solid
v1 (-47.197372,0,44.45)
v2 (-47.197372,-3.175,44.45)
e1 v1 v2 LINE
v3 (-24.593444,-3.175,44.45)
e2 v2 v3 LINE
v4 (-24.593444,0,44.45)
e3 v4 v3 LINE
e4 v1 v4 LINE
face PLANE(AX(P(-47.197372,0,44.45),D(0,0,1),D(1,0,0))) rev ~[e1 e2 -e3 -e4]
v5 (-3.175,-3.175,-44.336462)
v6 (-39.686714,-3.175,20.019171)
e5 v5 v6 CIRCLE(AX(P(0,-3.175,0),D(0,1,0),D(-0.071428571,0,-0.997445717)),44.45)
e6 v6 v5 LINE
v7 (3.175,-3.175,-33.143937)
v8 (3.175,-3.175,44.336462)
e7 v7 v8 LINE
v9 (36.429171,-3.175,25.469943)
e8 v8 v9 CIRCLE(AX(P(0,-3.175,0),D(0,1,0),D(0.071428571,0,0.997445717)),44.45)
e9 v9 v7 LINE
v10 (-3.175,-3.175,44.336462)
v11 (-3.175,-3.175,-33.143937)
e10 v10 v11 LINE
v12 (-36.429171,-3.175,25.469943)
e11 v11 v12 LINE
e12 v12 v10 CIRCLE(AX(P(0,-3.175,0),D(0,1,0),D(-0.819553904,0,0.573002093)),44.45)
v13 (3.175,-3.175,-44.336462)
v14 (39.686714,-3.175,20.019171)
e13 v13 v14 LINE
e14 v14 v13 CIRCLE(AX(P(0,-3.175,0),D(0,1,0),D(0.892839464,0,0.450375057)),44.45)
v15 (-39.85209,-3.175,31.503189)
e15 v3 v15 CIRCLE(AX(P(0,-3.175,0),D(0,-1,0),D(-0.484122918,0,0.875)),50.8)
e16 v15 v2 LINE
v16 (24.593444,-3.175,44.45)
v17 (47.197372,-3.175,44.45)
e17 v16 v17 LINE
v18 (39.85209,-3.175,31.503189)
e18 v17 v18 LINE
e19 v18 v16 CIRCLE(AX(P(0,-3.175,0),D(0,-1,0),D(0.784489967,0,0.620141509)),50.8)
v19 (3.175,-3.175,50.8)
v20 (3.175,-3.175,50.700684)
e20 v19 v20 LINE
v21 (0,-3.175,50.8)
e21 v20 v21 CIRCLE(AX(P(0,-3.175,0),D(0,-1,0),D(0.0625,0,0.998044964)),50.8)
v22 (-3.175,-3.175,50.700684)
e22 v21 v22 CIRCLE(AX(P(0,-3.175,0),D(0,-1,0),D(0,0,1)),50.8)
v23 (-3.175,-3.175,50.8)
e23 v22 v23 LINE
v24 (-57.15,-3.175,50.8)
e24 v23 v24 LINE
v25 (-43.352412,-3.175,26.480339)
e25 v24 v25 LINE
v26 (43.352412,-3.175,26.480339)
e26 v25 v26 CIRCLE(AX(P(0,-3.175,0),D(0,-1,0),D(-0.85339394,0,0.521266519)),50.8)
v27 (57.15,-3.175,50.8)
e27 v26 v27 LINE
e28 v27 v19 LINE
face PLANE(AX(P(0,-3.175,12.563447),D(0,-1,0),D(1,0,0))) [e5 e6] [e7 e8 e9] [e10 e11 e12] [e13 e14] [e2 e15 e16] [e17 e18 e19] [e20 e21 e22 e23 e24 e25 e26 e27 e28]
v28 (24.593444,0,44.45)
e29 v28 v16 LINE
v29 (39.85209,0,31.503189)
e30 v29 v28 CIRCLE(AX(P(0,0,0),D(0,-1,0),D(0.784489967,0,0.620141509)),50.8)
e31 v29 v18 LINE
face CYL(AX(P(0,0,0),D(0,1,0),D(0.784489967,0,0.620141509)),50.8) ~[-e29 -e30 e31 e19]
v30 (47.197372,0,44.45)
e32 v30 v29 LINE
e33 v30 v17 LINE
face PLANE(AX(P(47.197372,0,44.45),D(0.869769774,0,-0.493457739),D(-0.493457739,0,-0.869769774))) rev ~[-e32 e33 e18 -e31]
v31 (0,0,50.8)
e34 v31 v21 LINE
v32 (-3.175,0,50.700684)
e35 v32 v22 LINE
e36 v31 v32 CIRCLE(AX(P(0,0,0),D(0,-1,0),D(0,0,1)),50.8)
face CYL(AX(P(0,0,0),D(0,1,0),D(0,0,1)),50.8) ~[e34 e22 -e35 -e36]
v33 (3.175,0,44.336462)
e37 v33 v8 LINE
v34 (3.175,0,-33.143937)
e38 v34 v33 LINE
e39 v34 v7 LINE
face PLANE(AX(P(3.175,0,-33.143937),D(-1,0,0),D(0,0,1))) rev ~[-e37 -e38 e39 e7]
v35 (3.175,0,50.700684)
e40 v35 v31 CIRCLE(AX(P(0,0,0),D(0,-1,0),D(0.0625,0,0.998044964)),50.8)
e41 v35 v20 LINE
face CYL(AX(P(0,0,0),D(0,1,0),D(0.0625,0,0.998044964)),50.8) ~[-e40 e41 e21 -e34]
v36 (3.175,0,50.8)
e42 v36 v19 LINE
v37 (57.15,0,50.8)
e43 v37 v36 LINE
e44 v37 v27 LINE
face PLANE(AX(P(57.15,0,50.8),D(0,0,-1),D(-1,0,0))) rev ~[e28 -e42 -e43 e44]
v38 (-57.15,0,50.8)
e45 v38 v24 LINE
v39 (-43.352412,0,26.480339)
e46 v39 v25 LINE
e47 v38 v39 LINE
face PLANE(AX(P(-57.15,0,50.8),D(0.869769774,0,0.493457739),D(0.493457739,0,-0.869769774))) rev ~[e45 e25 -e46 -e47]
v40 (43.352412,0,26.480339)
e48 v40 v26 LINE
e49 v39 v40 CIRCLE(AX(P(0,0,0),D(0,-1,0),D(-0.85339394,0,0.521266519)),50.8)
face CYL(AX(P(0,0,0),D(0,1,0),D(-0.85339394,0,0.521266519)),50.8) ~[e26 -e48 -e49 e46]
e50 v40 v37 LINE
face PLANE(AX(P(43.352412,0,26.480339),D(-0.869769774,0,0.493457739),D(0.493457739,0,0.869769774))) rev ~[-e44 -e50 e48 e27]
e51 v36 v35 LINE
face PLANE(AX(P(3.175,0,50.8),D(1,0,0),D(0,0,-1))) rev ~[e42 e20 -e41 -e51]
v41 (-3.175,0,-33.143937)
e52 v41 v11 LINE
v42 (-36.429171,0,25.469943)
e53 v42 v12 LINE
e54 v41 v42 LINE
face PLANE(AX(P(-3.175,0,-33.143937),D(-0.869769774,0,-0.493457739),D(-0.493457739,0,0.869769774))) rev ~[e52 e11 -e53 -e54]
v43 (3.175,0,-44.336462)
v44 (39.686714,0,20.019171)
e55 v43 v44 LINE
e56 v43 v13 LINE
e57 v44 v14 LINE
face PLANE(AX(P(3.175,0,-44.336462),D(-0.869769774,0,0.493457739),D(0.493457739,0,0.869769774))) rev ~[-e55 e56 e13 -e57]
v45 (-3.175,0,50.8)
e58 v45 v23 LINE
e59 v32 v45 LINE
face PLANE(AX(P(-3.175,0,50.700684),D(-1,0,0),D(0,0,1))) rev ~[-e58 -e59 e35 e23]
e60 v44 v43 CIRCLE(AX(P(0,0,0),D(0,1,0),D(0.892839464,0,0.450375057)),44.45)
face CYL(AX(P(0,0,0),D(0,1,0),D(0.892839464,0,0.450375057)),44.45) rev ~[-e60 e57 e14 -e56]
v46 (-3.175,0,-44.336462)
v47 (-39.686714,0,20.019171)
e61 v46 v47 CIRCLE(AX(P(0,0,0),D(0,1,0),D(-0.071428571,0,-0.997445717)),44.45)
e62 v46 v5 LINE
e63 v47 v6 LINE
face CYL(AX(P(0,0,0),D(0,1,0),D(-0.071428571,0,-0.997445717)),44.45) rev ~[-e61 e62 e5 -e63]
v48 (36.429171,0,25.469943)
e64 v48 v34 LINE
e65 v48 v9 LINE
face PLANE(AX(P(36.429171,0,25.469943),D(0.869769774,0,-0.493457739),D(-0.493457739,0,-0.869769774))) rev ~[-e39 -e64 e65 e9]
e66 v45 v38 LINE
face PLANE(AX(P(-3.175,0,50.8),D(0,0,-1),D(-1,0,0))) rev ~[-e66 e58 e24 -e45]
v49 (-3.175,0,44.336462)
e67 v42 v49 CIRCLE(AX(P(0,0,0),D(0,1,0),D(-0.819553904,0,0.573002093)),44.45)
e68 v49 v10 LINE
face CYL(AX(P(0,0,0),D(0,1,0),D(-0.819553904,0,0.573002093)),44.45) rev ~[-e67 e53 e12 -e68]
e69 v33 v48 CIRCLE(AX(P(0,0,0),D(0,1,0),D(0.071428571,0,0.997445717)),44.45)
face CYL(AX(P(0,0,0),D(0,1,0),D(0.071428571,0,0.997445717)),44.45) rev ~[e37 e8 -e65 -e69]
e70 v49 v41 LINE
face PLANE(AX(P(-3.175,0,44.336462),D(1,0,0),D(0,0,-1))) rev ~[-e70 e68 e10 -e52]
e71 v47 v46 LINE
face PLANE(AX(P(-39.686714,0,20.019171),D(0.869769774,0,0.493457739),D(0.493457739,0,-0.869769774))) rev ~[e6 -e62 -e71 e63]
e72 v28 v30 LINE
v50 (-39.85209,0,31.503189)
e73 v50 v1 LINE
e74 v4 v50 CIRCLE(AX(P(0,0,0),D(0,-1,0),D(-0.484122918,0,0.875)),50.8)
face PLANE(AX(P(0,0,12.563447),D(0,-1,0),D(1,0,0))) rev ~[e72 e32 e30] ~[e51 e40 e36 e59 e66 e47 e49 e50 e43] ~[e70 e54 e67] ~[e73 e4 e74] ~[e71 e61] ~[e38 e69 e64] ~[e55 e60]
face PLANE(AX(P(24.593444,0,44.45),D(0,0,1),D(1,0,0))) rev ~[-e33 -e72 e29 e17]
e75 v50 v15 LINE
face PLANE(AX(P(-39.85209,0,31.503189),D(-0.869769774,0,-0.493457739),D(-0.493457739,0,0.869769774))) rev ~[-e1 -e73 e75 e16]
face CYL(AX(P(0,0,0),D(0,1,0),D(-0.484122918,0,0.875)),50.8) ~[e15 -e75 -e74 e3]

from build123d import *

# Parameters (mm, degrees)
F1_DEPTH = 3.175


# Not quite as in the source:
# - a length typed as a fraction of an inch, garbled in the dataset ("3 / 203.2 mm" for 3/8 in), is restored


with BuildPart() as f1:
    # F0 (on Front) → F1 (new body)
    with BuildSketch(Plane.XZ):
        with BuildLine():
            ThreePointArc((-43.3524121445, 26.4803391454), (-44.3048599399, -24.8539611673), (0, -50.8))
            ThreePointArc((0, -50.8), (44.3048599399, -24.8539611673), (43.3524121445, 26.4803391454))
            Line((43.3524121445, 26.4803391454), (57.15, 50.8))
            Line((57.15, 50.8), (50.8, 50.8))
            Line((50.8, 50.8), (3.175, 50.8))
            Line((3.175, 50.8), (3.175, 50.700684167))
            ThreePointArc((3.175, 50.700684167), (1.5882764743, 50.7751649711), (0, 50.8))
            ThreePointArc((0, 50.8), (-1.5882764743, 50.7751649711), (-3.175, 50.700684167))
            Line((-3.175, 50.700684167), (-3.175, 50.8))
            Line((-3.175, 50.8), (-50.8, 50.8))
            Line((-50.8, 50.8), (-57.15, 50.8))
            Line((-57.15, 50.8), (-43.3524121445, 26.4803391454))
        make_face()
        with BuildLine():
            Line((-39.6867141727, 20.0191712658), (-3.175, -44.336462139))
            ThreePointArc((-3.175, -44.336462139), (-38.6612664458, -21.9341965162), (-39.6867141727, 20.0191712658))
        make_face(mode=Mode.SUBTRACT)
        with BuildLine():
            ThreePointArc((39.6867141727, 20.0191712658), (38.6612664458, -21.9341965162), (3.175, -44.336462139))
            Line((3.175, -44.336462139), (39.6867141727, 20.0191712658))
        make_face(mode=Mode.SUBTRACT)
        with BuildLine():
            ThreePointArc((-36.429171038, 25.4699430208), (-21.9341965162, 38.6612664458), (-3.175, 44.336462139))
            Line((-3.175, 44.336462139), (-3.175, -33.1439371814))
            Line((-3.175, -33.1439371814), (-36.429171038, 25.4699430208))
        make_face(mode=Mode.SUBTRACT)
        with BuildLine():
            Line((-47.1973723398, 44.45), (-24.5934442484, 44.45))
            ThreePointArc((-24.5934442484, 44.45), (-32.8665744068, 38.7353622258), (-39.8520903437, 31.5031886519))
            Line((-39.8520903437, 31.5031886519), (-47.1973723398, 44.45))
        make_face(mode=Mode.SUBTRACT)
        with BuildLine():
            Line((3.175, -33.1439371814), (3.175, 44.336462139))
            ThreePointArc((3.175, 44.336462139), (21.9341965162, 38.6612664458), (36.429171038, 25.4699430208))
            Line((36.429171038, 25.4699430208), (3.175, -33.1439371814))
        make_face(mode=Mode.SUBTRACT)
        with BuildLine():
            ThreePointArc((39.8520903437, 31.5031886519), (32.8665744068, 38.7353622258), (24.5934442484, 44.45))
            Line((24.5934442484, 44.45), (47.1973723398, 44.45))
            Line((47.1973723398, 44.45), (39.8520903437, 31.5031886519))
        make_face(mode=Mode.SUBTRACT)
    extrude(amount=F1_DEPTH)


solid = f1.part
